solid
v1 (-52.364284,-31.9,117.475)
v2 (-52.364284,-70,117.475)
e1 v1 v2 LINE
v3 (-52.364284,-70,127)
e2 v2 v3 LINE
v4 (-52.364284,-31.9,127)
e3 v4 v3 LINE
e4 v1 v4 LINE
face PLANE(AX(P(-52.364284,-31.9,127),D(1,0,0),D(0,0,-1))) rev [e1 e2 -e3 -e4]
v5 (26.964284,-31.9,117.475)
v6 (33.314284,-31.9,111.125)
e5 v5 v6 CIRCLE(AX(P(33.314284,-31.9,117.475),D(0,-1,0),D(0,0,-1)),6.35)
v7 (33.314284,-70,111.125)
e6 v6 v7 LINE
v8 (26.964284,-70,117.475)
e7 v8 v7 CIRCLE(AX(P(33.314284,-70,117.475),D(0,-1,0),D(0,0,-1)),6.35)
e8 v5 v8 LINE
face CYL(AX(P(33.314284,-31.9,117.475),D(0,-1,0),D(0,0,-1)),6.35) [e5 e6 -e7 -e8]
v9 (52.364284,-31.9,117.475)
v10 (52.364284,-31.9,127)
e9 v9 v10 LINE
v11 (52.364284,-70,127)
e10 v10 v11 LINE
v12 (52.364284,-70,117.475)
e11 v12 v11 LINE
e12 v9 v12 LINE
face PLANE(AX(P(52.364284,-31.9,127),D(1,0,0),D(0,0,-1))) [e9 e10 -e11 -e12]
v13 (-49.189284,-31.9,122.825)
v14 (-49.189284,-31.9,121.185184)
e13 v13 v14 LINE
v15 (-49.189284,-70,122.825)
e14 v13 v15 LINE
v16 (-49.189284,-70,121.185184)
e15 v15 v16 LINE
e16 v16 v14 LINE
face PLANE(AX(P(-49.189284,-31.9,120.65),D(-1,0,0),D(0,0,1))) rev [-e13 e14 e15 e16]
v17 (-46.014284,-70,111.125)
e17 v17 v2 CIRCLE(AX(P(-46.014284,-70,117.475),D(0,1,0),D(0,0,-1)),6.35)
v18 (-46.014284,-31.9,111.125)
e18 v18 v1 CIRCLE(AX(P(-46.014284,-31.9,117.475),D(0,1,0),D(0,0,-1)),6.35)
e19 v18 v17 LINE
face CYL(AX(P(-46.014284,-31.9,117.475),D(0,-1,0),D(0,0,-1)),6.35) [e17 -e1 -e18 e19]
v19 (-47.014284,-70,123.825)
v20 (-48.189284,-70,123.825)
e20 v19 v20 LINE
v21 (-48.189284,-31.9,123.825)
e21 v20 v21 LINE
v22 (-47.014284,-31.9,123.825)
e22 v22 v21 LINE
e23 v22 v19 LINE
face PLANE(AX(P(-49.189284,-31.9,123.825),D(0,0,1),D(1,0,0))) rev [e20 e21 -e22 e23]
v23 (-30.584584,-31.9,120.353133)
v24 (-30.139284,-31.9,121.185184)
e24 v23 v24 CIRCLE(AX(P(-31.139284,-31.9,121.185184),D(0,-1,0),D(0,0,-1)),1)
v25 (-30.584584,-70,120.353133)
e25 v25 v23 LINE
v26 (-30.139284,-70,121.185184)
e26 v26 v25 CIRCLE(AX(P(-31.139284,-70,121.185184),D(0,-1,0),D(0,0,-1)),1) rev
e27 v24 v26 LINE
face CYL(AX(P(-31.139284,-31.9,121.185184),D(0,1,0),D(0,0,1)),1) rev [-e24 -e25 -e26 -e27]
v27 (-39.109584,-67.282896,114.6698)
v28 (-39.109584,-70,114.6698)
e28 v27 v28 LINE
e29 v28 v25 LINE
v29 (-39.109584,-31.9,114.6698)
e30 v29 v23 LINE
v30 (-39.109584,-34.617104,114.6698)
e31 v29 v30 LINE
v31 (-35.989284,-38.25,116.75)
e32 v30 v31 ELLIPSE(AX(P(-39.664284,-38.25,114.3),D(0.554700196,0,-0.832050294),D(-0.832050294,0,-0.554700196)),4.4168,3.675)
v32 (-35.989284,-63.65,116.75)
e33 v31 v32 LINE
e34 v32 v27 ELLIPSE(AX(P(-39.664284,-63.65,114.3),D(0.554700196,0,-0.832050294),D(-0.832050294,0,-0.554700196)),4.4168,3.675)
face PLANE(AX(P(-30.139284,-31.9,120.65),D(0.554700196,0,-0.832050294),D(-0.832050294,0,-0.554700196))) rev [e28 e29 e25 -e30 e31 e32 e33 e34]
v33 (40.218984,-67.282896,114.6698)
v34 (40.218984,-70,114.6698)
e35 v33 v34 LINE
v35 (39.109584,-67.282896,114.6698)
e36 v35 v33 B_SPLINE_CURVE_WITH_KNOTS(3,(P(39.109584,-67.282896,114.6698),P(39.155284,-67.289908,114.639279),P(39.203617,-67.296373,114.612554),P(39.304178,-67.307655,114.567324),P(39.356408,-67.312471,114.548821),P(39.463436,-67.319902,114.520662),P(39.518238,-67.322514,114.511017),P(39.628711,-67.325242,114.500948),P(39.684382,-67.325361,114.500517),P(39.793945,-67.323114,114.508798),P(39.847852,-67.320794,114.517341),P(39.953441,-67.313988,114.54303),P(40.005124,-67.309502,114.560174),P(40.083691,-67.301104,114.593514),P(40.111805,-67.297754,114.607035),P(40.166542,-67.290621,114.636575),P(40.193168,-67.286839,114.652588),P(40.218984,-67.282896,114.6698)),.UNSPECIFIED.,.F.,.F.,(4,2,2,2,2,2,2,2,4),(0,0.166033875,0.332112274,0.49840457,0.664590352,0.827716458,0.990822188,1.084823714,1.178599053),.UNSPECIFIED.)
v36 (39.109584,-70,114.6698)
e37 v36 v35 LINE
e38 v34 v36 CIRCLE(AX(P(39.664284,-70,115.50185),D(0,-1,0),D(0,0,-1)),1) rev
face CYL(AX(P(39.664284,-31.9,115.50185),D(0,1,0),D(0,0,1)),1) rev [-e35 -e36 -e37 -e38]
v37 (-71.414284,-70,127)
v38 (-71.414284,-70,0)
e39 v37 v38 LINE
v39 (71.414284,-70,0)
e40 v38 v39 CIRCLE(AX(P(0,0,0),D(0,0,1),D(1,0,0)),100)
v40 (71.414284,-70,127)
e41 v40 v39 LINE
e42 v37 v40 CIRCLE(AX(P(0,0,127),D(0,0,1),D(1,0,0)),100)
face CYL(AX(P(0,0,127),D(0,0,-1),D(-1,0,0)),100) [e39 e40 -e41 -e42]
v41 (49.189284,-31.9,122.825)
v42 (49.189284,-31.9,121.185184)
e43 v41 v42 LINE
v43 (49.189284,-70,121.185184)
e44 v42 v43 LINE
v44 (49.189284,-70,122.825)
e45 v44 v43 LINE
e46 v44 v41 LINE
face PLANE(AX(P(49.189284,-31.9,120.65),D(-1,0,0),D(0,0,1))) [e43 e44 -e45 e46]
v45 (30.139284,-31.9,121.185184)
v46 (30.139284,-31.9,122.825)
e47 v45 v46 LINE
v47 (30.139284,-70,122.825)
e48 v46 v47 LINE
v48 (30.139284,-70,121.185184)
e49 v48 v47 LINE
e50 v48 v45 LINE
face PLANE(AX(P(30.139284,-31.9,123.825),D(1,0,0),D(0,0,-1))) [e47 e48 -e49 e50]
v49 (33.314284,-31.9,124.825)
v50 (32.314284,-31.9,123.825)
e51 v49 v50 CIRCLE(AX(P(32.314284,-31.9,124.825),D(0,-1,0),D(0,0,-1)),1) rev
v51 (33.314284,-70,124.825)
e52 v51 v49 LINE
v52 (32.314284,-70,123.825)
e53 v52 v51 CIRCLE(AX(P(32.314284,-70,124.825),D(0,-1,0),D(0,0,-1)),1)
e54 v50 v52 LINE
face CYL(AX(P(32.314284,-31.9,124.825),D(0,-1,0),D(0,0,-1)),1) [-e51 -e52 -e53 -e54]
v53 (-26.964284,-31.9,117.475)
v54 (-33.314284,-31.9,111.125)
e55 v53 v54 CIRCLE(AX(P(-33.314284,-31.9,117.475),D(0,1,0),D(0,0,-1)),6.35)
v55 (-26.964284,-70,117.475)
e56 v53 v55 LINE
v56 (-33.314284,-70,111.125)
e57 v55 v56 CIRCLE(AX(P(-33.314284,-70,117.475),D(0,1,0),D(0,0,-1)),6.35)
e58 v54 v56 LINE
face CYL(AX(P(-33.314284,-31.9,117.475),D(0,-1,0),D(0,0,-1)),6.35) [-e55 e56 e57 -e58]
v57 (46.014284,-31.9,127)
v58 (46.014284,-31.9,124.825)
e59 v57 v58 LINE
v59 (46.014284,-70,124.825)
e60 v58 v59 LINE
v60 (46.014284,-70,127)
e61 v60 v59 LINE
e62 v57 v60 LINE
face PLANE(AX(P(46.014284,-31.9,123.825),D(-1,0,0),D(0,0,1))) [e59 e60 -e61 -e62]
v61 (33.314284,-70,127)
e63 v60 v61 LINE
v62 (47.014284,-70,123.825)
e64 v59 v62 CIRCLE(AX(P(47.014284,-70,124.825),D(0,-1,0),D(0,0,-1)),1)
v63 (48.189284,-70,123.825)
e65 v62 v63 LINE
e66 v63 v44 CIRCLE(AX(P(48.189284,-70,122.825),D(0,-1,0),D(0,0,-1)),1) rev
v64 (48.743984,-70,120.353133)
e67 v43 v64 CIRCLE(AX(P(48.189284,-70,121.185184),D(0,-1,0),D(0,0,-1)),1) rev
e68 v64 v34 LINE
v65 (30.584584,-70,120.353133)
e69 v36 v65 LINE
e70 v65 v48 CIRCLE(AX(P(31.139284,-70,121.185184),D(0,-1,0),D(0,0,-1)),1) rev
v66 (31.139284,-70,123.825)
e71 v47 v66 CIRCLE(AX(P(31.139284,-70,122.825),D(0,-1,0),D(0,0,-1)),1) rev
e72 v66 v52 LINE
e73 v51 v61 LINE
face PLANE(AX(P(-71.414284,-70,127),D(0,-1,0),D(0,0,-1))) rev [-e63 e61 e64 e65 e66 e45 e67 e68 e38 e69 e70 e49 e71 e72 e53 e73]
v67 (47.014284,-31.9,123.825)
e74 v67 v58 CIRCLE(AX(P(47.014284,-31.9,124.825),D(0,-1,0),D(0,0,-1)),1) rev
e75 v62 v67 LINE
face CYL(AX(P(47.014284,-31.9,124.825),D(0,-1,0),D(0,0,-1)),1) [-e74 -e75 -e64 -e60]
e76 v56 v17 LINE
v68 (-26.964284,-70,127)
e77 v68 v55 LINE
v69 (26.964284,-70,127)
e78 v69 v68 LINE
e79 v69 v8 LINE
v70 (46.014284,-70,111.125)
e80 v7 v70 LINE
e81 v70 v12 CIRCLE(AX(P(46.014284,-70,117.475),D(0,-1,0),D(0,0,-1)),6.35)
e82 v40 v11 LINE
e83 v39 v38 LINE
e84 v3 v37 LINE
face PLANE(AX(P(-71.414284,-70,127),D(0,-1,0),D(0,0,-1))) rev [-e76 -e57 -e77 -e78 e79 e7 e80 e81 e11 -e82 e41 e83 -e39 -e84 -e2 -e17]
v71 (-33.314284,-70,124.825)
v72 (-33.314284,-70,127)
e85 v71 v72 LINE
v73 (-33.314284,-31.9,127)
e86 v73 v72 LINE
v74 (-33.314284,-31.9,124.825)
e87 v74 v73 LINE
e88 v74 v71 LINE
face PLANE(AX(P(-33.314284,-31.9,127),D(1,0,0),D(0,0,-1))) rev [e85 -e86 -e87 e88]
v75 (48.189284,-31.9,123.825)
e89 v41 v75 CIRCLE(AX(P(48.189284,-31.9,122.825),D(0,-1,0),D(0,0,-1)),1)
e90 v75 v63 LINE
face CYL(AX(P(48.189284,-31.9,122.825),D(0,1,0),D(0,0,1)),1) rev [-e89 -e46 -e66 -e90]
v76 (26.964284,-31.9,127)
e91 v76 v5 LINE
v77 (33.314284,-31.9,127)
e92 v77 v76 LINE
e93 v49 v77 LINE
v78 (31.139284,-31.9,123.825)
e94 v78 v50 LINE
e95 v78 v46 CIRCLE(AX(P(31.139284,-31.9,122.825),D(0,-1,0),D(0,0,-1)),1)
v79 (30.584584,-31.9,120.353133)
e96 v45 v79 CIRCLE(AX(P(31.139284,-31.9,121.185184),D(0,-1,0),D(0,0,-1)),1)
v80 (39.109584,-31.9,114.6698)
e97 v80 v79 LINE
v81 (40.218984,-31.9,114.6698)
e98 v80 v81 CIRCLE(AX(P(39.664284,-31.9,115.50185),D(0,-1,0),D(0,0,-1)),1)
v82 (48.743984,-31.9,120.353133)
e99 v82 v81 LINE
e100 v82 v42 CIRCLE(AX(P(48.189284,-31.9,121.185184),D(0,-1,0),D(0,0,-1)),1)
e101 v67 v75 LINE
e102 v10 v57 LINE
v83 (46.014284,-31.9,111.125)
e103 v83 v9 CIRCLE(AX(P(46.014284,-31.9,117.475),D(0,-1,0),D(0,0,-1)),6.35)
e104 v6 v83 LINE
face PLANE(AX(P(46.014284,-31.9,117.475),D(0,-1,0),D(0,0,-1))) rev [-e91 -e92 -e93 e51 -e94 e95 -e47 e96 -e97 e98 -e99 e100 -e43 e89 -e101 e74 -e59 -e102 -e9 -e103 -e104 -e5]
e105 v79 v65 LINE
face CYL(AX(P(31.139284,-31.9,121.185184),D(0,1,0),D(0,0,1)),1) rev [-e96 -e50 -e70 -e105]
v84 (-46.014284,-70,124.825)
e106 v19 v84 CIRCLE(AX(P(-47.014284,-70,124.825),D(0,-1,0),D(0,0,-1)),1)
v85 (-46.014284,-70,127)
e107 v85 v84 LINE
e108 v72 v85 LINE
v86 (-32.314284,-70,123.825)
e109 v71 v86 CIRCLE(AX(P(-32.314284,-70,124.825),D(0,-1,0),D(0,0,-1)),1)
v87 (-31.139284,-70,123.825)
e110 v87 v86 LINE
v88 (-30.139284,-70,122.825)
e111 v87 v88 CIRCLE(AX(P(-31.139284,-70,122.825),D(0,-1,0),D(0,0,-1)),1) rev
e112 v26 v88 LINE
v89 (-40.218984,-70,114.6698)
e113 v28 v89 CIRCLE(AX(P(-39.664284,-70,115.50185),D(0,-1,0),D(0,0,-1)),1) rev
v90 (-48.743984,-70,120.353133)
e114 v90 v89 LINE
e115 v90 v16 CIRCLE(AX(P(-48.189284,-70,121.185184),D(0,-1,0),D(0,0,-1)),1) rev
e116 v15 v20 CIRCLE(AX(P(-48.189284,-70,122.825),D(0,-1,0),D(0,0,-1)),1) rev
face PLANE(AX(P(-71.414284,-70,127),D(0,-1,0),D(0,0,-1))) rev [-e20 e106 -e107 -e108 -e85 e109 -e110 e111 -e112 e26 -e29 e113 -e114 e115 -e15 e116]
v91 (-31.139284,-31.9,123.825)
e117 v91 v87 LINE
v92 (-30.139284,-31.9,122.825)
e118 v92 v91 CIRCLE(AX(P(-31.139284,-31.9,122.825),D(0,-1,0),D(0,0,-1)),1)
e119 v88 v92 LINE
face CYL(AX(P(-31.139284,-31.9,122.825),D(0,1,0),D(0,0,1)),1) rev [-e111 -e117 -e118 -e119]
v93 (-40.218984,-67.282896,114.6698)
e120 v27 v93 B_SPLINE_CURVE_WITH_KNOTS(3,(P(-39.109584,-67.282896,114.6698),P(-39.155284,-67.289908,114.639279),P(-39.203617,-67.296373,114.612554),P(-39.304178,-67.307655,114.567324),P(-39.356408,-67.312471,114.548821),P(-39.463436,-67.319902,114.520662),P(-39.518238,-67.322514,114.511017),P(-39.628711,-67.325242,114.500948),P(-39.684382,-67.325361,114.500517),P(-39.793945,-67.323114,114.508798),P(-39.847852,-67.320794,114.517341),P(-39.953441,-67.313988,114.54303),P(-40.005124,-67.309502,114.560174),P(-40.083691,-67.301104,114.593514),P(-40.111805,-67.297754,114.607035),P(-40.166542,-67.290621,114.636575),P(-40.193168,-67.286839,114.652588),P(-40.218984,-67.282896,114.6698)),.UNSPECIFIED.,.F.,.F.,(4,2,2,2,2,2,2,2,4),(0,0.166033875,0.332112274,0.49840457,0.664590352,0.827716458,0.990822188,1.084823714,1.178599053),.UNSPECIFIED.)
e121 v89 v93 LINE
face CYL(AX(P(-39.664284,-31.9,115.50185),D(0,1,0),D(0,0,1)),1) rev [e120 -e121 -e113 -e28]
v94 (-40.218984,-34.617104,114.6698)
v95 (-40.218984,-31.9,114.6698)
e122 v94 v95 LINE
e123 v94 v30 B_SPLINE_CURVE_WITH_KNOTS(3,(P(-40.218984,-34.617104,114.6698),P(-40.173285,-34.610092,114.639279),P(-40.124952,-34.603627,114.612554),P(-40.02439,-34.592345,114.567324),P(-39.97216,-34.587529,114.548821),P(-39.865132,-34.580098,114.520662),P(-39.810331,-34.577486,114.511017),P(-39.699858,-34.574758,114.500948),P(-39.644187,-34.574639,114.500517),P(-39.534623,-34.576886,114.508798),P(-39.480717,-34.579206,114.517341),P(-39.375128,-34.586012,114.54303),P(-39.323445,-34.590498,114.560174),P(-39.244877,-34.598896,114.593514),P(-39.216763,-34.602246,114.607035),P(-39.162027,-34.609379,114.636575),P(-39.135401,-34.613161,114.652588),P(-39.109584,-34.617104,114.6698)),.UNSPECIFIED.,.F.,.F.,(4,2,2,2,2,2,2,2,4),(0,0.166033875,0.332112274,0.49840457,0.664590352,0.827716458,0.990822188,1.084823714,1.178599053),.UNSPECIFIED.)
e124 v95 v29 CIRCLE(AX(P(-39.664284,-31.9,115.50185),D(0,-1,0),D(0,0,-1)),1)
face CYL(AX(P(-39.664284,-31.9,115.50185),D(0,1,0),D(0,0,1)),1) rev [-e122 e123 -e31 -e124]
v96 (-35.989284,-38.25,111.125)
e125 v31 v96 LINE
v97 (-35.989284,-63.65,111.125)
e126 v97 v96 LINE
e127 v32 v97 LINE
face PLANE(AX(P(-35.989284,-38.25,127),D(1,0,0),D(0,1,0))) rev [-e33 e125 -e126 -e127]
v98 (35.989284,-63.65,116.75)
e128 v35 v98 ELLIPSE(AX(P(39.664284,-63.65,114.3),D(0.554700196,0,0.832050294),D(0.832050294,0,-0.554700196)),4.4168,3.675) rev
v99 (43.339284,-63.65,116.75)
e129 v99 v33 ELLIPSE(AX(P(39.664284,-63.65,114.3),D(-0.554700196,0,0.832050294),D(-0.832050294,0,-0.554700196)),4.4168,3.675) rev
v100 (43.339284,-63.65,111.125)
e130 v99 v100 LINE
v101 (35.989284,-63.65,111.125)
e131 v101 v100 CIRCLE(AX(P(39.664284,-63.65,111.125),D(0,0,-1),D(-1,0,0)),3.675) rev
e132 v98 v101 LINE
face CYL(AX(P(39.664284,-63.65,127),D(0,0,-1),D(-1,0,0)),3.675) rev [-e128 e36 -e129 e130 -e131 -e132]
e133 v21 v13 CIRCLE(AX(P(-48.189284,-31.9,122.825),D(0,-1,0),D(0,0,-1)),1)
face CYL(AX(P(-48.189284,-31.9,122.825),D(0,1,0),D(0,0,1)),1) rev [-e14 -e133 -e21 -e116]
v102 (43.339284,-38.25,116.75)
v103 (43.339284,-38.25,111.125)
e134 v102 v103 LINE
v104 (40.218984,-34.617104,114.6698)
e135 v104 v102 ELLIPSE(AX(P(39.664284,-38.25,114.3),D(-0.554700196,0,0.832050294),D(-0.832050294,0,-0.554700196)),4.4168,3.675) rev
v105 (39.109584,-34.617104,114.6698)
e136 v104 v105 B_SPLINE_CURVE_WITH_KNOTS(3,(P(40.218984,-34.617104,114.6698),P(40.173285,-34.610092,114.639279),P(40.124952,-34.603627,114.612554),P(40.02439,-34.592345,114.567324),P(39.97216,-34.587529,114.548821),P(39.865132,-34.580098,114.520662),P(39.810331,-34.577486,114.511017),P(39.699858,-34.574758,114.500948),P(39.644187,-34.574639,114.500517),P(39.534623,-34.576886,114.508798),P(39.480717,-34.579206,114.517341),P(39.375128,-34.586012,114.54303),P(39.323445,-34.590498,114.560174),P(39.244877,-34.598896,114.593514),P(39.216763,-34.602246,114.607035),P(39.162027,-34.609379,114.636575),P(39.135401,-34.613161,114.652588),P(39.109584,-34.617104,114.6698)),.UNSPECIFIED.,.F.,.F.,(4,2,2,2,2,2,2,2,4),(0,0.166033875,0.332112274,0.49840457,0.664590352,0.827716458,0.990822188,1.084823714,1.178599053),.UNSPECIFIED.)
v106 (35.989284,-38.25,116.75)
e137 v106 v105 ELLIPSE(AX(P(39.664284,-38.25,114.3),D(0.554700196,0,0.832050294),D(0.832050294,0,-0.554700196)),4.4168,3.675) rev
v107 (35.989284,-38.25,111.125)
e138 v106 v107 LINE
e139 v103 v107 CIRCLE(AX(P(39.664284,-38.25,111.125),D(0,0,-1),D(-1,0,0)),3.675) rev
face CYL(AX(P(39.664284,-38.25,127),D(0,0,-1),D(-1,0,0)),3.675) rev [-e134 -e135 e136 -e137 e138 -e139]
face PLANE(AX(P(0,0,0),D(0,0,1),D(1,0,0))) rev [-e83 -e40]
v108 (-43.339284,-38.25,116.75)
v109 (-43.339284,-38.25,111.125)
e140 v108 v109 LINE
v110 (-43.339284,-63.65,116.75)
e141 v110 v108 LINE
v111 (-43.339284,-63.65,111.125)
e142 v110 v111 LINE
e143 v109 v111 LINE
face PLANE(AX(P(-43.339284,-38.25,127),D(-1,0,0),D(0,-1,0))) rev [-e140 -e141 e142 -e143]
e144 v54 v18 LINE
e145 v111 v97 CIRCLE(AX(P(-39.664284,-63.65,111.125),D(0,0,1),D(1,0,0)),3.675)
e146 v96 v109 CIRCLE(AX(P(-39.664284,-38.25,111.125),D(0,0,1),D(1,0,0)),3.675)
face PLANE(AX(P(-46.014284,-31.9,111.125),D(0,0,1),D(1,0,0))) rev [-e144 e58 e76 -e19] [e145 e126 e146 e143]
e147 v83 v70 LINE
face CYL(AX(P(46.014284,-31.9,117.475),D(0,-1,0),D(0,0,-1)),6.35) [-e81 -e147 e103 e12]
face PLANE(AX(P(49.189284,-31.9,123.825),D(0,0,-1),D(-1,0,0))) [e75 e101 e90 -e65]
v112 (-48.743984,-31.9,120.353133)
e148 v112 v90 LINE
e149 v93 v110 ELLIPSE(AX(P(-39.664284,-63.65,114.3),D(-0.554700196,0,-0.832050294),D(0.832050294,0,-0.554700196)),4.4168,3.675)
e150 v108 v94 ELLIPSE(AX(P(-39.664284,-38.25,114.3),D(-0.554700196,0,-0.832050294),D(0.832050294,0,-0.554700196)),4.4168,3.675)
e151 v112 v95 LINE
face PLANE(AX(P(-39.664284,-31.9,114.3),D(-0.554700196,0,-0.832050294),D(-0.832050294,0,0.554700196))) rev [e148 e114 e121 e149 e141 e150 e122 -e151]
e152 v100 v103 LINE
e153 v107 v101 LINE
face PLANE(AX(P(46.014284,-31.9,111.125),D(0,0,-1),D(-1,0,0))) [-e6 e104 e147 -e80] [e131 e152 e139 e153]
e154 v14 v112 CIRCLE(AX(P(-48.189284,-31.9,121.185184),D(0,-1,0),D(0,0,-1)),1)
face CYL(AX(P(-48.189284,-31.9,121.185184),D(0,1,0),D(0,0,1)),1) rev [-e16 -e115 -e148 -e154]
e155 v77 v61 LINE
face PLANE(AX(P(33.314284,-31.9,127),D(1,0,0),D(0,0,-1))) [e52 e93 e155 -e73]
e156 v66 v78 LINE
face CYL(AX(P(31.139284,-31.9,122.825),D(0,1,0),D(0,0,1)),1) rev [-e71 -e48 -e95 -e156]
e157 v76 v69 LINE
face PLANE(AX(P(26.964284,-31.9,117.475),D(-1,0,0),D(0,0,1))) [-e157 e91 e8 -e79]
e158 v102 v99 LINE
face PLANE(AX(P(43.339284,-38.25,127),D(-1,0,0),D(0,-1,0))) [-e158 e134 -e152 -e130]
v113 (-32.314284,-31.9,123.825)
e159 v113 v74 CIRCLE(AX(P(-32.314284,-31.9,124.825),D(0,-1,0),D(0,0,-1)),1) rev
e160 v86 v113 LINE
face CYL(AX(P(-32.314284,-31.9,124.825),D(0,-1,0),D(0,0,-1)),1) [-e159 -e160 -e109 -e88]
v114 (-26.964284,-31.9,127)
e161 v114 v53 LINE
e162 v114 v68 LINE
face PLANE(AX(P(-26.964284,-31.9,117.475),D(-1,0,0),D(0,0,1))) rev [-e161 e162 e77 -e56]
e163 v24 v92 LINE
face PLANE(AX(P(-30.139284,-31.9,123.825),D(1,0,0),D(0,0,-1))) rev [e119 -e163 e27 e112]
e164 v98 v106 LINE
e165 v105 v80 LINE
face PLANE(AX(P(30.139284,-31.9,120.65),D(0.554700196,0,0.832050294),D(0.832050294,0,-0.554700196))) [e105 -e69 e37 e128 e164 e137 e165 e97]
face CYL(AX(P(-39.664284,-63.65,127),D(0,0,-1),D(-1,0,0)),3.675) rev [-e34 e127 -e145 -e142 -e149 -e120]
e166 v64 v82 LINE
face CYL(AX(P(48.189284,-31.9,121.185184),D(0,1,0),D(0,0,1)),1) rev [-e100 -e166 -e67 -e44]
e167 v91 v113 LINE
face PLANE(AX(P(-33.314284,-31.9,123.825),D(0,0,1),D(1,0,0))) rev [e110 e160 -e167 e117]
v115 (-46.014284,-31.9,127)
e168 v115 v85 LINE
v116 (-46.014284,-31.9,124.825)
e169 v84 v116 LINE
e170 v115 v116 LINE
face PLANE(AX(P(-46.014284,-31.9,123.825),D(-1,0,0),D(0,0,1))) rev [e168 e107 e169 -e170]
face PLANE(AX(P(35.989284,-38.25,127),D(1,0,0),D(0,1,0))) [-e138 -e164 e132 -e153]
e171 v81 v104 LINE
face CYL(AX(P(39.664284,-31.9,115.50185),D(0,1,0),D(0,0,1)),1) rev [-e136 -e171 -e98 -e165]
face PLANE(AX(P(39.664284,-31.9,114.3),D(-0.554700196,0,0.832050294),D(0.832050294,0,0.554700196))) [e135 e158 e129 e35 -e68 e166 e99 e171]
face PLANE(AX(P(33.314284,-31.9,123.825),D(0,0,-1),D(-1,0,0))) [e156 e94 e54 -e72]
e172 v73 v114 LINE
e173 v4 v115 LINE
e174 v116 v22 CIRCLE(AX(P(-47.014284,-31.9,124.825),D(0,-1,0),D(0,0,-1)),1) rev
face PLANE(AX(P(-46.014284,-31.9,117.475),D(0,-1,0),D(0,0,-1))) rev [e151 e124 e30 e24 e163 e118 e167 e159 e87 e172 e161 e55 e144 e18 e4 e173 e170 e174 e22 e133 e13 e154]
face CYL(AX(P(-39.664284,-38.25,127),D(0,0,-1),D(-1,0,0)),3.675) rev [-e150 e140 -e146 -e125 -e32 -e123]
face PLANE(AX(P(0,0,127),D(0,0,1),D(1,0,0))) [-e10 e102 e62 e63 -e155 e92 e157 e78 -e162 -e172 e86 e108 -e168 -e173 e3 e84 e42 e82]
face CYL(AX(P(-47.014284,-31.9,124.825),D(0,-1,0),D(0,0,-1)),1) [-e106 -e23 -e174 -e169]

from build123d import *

# Parameters (mm, degrees)
BOSS_EXTRUDE1_DEPTH = 127
BOSS_EXTRUDE2_DEPTH = 38.1
FILLET1_R           = 1
CUT_EXTRUDE1_DEPTH  = 166.676690047


# Read off the part's stored shape, not the designer's step: Mirror1
with BuildPart() as part:
    # Sketch2 → Boss-Extrude1 (new body)
    with BuildSketch(Plane.XY):
        with BuildLine():
            Line((-71.414284285, -70), (71.414284285, -70))
            ThreePointArc((71.414284285, -70), (0, -100), (-71.414284285, -70))
        make_face()
    extrude(amount=BOSS_EXTRUDE1_DEPTH)

    # Sketch3 → Boss-Extrude2 (add)
    with BuildSketch(Plane(origin=(0, -70, 0), x_dir=(1, 0, 0), z_dir=(0, 1, 0))):
        with BuildLine():
            Line((-52.364284285, -127), (-52.364284285, -117.475))
            ThreePointArc((-52.364284285, -117.475), (-50.504412346, -112.984871939), (-46.014284285, -111.125))
            Line((-46.014284285, -111.125), (-33.314284285, -111.125))
            ThreePointArc((-33.314284285, -111.125), (-28.824156225, -112.984871939), (-26.964284285, -117.475))
            Line((-26.964284285, -117.475), (-26.964284285, -127))
            Line((-26.964284285, -127), (-33.314284285, -127))
            Line((-33.314284285, -127), (-33.314284285, -123.825))
            Line((-33.314284285, -123.825), (-30.139284285, -123.825))
            Line((-30.139284285, -123.825), (-30.139284285, -120.65))
            Line((-30.139284285, -120.65), (-39.664284285, -114.3))
            Line((-39.664284285, -114.3), (-49.189284285, -120.65))
            Line((-49.189284285, -120.65), (-49.189284285, -123.825))
            Line((-49.189284285, -123.825), (-46.014284285, -123.825))
            Line((-46.014284285, -123.825), (-46.014284285, -127))
            Line((-46.014284285, -127), (-52.364284285, -127))
        make_face()
    extrude(amount=BOSS_EXTRUDE2_DEPTH)

    # Fillet1
    fillet1_edges = [part.edges().sort_by_distance(p)[0] for p in [
        (-46.014284285, -50.95, 123.825),
        (-49.189284285, -50.95, 123.825),
        (-49.189284285, -50.95, 120.65),
        (-39.664284285, -50.95, 114.3),
        (-30.139284285, -50.95, 120.65),
        (-30.139284285, -50.95, 123.825),
        (-33.314284285, -50.95, 123.825),
    ]]
    fillet(fillet1_edges, radius=FILLET1_R)

    # Sketch5 → Cut-Extrude1 (cut, symmetric)
    with BuildSketch(Plane(origin=(0, 0, 111.125), x_dir=(-1, 0, 0), z_dir=(0, 0, -1))):
        with BuildLine():
            Line((43.339284285, -38.25), (43.339284285, -63.65))
            ThreePointArc((43.339284285, -63.65), (39.664284285, -67.325), (35.989284285, -63.65))
            Line((35.989284285, -63.65), (35.989284285, -38.25))
            ThreePointArc((35.989284285, -38.25), (39.664284285, -34.575), (43.339284285, -38.25))
        make_face()
    extrude(amount=CUT_EXTRUDE1_DEPTH, both=True, mode=Mode.SUBTRACT)

    # Mirror1: part across plane


with BuildPart() as part_1:
    add(part.part)
    add(part.part.mirror(Plane(origin=(0, 0, 0), x_dir=(0, 0, 1), z_dir=(1, 0, 0))))


solid = part_1.part
